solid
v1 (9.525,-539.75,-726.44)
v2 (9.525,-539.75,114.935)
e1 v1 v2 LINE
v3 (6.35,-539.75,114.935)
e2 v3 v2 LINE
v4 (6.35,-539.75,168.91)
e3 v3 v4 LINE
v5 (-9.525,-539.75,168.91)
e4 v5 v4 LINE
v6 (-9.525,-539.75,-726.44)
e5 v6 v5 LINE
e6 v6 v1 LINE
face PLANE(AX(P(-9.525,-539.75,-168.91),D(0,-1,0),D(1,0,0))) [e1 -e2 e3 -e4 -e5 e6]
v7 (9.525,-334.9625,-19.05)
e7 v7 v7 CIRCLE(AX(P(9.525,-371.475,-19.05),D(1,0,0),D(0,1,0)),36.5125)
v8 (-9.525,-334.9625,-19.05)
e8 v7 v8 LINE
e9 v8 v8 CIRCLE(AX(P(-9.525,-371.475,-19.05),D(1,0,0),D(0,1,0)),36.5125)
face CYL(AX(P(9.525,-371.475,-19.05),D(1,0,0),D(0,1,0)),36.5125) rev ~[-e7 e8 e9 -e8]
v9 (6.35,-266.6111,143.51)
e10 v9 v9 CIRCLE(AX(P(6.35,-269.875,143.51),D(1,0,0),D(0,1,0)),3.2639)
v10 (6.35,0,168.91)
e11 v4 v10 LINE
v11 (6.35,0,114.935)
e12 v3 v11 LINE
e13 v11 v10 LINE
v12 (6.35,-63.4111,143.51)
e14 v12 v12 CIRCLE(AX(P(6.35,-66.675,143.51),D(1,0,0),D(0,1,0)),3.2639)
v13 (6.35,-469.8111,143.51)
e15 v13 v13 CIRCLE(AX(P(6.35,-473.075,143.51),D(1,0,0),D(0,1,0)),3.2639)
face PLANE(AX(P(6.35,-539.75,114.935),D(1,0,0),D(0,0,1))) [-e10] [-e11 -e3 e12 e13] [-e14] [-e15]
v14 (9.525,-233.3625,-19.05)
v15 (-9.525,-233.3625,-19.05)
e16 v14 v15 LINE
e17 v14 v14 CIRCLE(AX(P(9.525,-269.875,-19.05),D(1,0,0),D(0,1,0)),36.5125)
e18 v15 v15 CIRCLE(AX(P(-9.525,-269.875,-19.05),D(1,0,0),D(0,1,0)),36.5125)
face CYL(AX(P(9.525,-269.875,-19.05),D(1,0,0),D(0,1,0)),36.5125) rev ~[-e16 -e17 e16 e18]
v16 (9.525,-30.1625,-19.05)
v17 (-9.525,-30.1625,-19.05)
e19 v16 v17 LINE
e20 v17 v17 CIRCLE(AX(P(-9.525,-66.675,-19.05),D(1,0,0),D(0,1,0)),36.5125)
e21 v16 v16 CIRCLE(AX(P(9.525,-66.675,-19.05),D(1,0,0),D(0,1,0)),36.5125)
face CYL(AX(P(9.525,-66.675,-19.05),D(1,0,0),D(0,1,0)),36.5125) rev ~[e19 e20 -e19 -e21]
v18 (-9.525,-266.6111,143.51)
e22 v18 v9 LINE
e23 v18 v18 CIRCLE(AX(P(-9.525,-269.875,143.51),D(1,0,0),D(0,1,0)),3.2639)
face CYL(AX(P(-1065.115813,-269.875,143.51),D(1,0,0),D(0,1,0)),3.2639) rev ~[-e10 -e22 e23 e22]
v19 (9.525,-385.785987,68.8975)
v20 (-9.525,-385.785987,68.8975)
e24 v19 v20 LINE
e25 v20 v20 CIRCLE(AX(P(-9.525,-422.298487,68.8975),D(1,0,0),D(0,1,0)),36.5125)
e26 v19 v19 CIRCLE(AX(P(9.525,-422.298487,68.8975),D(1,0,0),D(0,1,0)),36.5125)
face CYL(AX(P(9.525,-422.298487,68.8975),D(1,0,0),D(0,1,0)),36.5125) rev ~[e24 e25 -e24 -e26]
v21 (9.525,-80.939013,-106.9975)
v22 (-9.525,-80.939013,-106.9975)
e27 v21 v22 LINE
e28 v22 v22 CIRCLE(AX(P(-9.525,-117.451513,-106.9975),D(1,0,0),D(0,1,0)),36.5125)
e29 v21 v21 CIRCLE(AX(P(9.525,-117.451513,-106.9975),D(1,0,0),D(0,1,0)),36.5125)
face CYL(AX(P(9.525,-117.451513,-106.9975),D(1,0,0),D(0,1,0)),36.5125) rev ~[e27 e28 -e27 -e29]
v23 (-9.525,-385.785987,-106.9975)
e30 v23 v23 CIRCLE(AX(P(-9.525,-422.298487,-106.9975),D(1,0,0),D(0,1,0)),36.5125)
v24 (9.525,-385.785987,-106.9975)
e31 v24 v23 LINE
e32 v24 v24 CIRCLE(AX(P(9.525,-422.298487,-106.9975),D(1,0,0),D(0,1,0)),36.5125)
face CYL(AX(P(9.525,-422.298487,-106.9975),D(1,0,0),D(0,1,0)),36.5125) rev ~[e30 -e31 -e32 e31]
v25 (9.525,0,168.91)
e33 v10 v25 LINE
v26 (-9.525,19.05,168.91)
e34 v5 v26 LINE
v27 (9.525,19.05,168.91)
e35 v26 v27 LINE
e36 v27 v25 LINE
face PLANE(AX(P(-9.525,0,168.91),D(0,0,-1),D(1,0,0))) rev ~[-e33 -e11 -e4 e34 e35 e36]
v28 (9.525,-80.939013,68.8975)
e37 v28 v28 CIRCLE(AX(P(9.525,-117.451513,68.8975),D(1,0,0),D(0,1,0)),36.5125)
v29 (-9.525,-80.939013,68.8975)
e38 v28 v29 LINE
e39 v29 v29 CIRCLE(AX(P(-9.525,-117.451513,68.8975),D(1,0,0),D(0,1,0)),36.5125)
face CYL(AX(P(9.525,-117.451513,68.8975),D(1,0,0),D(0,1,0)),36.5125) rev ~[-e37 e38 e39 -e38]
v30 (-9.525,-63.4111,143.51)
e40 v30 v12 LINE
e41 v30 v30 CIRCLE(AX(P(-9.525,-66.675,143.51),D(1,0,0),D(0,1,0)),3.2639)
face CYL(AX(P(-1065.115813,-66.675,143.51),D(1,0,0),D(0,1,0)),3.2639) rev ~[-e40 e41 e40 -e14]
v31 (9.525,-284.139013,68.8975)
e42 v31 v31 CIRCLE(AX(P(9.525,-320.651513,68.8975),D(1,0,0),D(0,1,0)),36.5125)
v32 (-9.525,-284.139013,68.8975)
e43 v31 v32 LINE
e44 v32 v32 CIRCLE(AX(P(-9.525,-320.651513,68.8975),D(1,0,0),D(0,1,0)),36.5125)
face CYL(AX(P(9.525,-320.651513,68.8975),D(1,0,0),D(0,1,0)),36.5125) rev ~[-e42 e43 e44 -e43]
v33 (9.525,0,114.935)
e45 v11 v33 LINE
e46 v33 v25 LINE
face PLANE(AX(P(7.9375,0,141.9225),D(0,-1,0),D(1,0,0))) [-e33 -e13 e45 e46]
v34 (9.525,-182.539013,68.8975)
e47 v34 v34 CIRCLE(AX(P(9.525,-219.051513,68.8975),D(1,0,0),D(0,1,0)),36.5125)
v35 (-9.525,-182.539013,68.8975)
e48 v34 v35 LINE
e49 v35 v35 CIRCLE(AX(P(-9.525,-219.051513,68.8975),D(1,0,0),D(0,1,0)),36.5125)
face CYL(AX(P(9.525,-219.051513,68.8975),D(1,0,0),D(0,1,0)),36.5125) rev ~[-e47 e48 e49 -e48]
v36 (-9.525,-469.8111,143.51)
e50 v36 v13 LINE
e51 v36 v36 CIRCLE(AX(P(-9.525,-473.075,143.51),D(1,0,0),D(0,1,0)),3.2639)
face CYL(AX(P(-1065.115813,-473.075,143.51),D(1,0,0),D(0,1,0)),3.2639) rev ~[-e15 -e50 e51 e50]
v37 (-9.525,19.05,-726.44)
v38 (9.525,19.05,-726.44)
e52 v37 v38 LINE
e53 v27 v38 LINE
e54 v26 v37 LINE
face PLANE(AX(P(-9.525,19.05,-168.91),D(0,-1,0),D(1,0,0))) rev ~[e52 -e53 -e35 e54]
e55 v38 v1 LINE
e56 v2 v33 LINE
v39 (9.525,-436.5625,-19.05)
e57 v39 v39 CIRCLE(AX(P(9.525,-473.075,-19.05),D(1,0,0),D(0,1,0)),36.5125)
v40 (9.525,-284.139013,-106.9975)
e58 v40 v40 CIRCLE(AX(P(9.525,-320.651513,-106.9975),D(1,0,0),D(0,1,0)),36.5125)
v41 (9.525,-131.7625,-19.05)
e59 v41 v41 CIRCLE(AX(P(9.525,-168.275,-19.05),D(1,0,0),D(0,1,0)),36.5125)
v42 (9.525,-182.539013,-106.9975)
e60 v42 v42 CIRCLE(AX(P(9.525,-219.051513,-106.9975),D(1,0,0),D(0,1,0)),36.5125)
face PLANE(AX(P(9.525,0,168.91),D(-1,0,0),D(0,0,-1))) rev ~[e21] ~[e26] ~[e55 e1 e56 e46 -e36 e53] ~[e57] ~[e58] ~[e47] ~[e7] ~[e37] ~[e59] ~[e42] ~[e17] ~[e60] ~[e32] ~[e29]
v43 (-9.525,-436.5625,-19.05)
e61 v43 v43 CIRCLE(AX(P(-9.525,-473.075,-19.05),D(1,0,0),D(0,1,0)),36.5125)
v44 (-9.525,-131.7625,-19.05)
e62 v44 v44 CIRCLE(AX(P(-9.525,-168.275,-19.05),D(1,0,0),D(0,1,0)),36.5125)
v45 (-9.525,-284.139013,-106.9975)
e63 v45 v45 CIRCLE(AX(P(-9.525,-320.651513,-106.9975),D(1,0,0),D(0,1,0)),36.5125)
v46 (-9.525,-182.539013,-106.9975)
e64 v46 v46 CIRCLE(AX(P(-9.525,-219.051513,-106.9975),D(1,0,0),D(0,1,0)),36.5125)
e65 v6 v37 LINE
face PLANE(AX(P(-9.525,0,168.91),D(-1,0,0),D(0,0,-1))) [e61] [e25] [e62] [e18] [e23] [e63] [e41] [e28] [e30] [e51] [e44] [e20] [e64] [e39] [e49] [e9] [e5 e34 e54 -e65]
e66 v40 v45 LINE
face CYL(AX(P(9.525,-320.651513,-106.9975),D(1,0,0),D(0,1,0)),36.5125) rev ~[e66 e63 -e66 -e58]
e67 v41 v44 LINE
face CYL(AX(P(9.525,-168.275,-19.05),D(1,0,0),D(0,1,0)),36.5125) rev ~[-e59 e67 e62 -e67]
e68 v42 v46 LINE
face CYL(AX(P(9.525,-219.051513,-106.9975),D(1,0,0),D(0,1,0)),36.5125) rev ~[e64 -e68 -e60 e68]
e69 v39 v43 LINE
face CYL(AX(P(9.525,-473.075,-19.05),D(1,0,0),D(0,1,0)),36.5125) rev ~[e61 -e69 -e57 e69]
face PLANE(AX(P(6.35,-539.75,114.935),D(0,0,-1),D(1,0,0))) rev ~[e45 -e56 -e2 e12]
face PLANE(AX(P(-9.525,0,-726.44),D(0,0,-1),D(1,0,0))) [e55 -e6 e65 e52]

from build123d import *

# Parameters (mm, degrees)
F0_W     = 19.05
F0_H     = 337.82
F1_DEPTH = 539.75
F2_R     = 36.5125
F3_DEPTH = 25.4
F4_DEPTH = 557.53
F5_DEPTH = 19.05
F6_W     = 3.175
F6_H     = 53.975
F7_DEPTH = 539.75
F9_D     = 6.5278


# Not quite as in the source:
# - a feature names something its author has since deleted; it is built from what else it names


with BuildPart() as f1:
    # F0 (on Front) → F1 (new body)
    with BuildSketch(Plane.XZ):
        Rectangle(F0_W, F0_H)
    extrude(amount=F1_DEPTH)

    # F2 (on face) → F3 (cut)
    with BuildSketch(Plane.YZ.offset(9.525)):
        with Locations((-269.875, -19.05)):
            Circle(F2_R)
        with Locations((-320.6515127996, 68.8975)):
            Circle(F2_R)
        with Locations((-219.0515127996, 68.8975)):
            Circle(F2_R)
        with Locations((-168.275, -19.05)):
            Circle(F2_R)
        with Locations((-117.4515127996, 68.8975)):
            Circle(F2_R)
        with Locations((-66.675, -19.05)):
            Circle(F2_R)
        with Locations((-371.475, -19.05)):
            Circle(F2_R)
        with Locations((-422.2984872004, 68.8975)):
            Circle(F2_R)
        with Locations((-473.075, -19.05)):
            Circle(F2_R)
        with Locations((-422.2984872004, -106.9975)):
            Circle(F2_R)
        with Locations((-320.6515127996, -106.9975)):
            Circle(F2_R)
        with Locations((-219.0515127996, -106.9975)):
            Circle(F2_R)
        with Locations((-117.4515127996, -106.9975)):
            Circle(F2_R)
    extrude(amount=-F3_DEPTH, mode=Mode.SUBTRACT)

    # F4 (add): a face of the model
    f4_faces = [f1.faces().sort_by_distance(p)[0] for p in [
        (0, -269.875, -168.91),
    ]]
    extrude(f4_faces, amount=F4_DEPTH)

    # F5 (add): a face of the model
    f5_faces = [f1.faces().sort_by_distance(p)[0] for p in [
        (0, 0, -278.765),
    ]]
    extrude(f5_faces, amount=F5_DEPTH)

    # F6 (on face) → F7 (cut, through all)
    with BuildSketch(Plane.XZ.offset(539.75)):
        with Locations((7.9375, 141.9225)):
            Rectangle(F6_W, F6_H)
    extrude(amount=-F7_DEPTH, mode=Mode.SUBTRACT)

    # F9 (through all)
    with Locations(Plane(origin=(-9.525, 0, 0), x_dir=(0, -1, 0), z_dir=(-1, 0, 0))):
        with Locations((66.675, 143.51), (269.875, 143.51), (473.075, 143.51)):
            Hole(F9_D / 2)


solid = f1.part
